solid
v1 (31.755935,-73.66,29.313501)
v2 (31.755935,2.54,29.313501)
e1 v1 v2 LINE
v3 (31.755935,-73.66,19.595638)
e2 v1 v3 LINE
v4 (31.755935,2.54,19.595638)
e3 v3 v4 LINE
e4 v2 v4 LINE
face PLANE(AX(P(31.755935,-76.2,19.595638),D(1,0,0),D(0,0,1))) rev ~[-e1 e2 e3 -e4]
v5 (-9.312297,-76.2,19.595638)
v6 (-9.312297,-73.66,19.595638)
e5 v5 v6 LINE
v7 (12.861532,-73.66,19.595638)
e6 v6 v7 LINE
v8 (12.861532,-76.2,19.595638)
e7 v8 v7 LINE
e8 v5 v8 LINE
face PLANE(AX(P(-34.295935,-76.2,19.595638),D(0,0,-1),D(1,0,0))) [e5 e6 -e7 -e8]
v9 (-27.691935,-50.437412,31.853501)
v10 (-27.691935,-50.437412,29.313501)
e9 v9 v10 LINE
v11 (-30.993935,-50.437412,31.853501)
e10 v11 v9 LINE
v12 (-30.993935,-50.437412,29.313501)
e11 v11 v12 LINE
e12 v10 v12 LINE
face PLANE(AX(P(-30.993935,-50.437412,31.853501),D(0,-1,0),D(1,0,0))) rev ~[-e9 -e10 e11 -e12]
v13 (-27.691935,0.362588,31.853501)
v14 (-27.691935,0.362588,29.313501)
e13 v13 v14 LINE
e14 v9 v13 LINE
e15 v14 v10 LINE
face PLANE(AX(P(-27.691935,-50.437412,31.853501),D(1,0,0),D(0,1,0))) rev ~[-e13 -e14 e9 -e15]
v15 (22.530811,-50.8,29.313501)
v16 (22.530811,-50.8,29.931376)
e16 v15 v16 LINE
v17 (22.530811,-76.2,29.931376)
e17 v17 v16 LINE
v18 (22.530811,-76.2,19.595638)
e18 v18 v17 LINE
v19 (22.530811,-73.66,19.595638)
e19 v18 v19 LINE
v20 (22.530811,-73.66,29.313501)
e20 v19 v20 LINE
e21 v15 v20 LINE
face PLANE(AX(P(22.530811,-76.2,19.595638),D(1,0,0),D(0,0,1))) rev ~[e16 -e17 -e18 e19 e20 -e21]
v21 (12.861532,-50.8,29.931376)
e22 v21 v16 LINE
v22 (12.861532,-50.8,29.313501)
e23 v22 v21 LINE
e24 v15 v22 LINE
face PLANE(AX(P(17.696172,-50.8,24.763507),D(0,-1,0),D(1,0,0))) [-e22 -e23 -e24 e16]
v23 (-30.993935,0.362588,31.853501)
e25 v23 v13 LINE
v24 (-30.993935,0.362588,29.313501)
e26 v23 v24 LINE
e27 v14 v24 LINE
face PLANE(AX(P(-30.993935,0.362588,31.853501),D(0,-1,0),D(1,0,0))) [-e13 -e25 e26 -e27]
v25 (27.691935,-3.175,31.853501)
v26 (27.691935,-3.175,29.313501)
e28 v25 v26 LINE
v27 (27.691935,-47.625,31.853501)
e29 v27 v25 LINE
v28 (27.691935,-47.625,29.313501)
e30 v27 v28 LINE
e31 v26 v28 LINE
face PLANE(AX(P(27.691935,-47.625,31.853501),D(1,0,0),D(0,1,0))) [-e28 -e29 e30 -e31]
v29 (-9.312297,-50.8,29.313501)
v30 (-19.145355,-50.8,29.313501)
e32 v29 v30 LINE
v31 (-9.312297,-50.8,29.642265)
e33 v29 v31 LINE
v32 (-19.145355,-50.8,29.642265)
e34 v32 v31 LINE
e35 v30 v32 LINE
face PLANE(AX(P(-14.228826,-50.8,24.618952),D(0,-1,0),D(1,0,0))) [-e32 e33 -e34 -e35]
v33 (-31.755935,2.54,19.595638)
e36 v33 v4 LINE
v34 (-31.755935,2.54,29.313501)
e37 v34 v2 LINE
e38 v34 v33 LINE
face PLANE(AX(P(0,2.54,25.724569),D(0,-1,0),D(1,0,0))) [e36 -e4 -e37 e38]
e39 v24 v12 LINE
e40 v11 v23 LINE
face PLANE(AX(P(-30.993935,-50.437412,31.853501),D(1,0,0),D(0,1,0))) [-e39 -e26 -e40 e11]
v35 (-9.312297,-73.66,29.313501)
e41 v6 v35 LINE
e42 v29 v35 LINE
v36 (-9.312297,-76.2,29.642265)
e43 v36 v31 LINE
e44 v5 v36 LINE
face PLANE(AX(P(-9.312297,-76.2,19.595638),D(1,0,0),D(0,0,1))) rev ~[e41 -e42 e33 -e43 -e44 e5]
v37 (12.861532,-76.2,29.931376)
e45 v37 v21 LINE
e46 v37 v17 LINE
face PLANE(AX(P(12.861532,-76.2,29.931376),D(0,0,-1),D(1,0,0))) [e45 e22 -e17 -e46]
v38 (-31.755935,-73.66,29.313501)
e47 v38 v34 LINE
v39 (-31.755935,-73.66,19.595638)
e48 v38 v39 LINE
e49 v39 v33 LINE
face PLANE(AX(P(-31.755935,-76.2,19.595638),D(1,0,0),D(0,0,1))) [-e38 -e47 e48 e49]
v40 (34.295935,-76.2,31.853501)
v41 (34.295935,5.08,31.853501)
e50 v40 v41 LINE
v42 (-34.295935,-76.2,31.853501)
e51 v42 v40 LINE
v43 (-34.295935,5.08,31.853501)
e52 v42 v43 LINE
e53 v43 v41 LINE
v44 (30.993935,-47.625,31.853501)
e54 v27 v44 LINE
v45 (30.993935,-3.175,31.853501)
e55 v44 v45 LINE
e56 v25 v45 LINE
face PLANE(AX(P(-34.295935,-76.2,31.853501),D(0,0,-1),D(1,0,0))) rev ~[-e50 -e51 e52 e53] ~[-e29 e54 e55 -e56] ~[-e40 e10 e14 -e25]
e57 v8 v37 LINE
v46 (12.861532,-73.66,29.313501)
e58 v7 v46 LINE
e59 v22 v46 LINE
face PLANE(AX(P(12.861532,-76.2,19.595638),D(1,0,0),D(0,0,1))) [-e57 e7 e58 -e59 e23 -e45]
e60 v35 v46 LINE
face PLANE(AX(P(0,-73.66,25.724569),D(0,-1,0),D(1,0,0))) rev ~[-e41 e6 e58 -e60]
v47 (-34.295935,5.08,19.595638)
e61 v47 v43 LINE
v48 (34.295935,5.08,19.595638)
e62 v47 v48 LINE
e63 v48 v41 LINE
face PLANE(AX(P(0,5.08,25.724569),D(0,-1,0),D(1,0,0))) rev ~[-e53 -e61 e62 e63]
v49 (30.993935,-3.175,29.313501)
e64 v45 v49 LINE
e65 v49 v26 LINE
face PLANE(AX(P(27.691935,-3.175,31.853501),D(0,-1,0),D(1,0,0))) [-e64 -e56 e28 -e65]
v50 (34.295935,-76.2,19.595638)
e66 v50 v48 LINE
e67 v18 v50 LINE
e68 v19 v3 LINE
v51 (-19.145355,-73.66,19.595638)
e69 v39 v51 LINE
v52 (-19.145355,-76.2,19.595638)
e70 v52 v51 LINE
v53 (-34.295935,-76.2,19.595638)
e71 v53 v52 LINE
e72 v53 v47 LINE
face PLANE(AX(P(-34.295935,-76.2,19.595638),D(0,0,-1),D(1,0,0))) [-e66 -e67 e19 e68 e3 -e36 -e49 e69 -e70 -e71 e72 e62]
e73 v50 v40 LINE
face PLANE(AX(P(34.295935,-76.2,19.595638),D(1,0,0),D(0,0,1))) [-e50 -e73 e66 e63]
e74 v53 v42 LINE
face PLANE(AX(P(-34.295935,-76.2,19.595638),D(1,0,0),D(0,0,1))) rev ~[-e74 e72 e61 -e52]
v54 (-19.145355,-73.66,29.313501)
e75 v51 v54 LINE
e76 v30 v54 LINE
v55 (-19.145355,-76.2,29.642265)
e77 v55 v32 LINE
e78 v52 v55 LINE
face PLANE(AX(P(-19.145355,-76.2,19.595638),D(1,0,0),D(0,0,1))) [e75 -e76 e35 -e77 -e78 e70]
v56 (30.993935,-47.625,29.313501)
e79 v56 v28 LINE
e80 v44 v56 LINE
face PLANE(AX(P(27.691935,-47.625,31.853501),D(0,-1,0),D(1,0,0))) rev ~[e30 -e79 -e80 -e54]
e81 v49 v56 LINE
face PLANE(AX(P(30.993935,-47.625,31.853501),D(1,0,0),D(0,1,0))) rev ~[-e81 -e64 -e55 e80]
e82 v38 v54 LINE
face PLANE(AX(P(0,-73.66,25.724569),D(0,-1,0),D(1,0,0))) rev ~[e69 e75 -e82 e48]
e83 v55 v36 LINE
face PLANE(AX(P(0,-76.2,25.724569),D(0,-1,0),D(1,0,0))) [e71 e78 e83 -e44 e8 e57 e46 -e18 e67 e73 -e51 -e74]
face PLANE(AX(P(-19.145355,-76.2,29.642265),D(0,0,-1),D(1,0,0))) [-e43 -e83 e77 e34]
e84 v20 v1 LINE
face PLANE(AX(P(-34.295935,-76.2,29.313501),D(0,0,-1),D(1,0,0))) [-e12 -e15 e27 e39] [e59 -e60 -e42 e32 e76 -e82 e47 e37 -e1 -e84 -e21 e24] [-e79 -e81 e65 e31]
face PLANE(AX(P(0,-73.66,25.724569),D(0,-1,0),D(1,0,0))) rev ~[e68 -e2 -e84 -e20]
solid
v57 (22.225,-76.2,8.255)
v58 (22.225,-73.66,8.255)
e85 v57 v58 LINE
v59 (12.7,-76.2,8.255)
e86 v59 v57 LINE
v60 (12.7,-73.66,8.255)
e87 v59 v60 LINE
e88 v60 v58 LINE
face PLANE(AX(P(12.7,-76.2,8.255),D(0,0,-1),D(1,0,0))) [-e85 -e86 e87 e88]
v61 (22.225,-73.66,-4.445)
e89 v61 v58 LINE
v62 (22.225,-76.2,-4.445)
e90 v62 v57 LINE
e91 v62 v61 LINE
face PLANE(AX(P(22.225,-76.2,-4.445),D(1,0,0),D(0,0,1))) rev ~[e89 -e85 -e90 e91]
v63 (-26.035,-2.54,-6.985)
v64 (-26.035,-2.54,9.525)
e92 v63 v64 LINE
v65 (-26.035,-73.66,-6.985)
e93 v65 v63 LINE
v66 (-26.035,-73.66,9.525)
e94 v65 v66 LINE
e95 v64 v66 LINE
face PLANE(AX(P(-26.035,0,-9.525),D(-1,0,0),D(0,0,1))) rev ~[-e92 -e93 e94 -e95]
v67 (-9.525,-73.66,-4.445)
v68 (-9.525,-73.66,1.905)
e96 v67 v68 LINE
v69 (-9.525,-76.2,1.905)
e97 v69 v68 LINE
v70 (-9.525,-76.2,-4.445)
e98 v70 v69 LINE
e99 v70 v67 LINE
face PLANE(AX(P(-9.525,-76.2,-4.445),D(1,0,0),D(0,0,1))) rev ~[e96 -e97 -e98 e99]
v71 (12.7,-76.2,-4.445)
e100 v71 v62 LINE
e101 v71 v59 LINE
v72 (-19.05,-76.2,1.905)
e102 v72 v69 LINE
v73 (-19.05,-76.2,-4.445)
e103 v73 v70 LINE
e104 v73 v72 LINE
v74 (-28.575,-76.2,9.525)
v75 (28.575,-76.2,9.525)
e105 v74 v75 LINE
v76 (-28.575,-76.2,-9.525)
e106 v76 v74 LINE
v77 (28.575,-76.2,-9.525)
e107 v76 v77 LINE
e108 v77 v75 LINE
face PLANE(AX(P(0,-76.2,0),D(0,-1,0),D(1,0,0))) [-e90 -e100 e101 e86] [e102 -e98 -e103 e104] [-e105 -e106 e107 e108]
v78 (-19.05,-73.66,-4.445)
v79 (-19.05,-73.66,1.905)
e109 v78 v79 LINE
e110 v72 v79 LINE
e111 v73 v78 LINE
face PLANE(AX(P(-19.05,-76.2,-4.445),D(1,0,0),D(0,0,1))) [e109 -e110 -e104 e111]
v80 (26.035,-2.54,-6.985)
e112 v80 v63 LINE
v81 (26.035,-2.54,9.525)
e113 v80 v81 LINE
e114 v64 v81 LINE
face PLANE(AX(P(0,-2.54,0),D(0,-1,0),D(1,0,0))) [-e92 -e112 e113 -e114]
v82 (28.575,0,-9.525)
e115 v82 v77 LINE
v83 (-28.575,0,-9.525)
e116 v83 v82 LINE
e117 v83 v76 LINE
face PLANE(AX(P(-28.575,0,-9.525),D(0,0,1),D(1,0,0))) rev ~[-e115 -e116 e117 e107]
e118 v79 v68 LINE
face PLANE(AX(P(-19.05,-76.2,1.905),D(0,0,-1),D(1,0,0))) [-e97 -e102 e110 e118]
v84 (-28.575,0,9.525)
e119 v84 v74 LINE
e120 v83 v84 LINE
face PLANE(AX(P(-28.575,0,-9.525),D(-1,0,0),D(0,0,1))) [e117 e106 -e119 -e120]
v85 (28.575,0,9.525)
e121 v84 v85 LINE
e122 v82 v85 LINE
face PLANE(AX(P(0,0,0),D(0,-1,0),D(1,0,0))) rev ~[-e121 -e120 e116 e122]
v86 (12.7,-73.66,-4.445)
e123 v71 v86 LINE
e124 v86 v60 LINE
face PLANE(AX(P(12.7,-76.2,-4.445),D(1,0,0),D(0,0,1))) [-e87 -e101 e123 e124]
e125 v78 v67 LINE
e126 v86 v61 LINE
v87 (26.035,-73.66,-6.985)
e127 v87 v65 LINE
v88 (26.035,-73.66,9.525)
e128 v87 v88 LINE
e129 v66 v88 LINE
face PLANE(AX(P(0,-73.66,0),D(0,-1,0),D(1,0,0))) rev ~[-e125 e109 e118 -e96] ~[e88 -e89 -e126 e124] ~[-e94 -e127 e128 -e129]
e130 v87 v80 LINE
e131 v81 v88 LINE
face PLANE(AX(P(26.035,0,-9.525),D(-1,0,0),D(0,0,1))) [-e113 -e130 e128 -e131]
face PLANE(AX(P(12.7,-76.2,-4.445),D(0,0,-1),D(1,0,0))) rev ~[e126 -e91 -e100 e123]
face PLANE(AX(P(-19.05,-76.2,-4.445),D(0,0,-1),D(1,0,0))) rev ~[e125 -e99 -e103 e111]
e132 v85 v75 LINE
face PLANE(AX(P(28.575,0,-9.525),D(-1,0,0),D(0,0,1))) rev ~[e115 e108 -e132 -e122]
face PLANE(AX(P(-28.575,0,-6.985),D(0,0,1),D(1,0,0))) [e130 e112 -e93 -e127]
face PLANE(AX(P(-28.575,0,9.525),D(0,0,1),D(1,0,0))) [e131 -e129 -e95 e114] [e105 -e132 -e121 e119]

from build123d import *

# Parameters (mm, degrees)
F0_W      = 57.15
F0_H      = 19.05
F1_DEPTH  = 76.2
F2_T      = -2.54
F3_W      = 9.525
F3_H      = 6.35
F4_DEPTH  = 25.4
F5_W      = 9.525
F5_H      = 12.7
F6_DEPTH  = 25.4
F8_W      = 68.5918703675
F8_H      = 12.2578628361
F9_DEPTH  = 81.28
F10_T     = -2.54
F11_W     = 9.833057411
F11_H     = 10.0466273725
F11_W_2   = 9.6692787483
F11_H_2   = 10.3357378393
F12_DEPTH = 25.4
F13_W     = 3.302
F13_H     = 50.8
F14_DEPTH = 25.4
F15_W     = 3.302
F15_H     = 44.45
F16_DEPTH = 25.4


with BuildPart() as f1:
    # F0 (on Front) → F1 (new body)
    with BuildSketch(Plane.XZ):
        Rectangle(F0_W, F0_H)
    extrude(amount=F1_DEPTH)

    # F2
    f2_openings = [f1.faces().sort_by_distance(p)[0] for p in [
        (0, -38.1, 9.525),
    ]]
    offset(amount=F2_T, openings=f2_openings)

    # F3 (on face) → F4 (cut)
    with BuildSketch(Plane.XZ.offset(76.2)):
        with Locations((-14.2875, -1.27)):
            Rectangle(F3_W, F3_H)
    extrude(amount=-F4_DEPTH, mode=Mode.SUBTRACT)

    # F5 (on face) → F6 (cut)
    with BuildSketch(Plane.XZ.offset(76.2)):
        with Locations((17.4625, 1.905)):
            Rectangle(F5_W, F5_H)
    extrude(amount=-F6_DEPTH, mode=Mode.SUBTRACT)


with BuildPart() as f9:
    # F8 (on face) → F9 (new body)
    with BuildSketch(Plane.XZ.offset(76.2)):
        with Locations((0, 25.7245693356)):
            Rectangle(F8_W, F8_H)
    extrude(amount=-F9_DEPTH)

    # F10
    f10_openings = [f9.faces().sort_by_distance(p)[0] for p in [
        (0, -35.56, 19.595638),
    ]]
    offset(amount=F10_T, openings=f10_openings)

    # F11 (on face) → F12 (cut)
    with BuildSketch(Plane.XZ.offset(76.2)):
        with Locations((-14.2288259231, 24.6189516038)):
            Rectangle(F11_W, F11_H)
        with Locations((17.6961715333, 24.7635068372)):
            Rectangle(F11_W_2, F11_H_2)
    extrude(amount=-F12_DEPTH, mode=Mode.SUBTRACT)

    # F13 (on face) → F14 (cut)
    with BuildSketch(Plane.XY.offset(31.8535007536)):
        with Locations((-29.3429351838, -25.0374122988)):
            Rectangle(F13_W, F13_H)
    extrude(amount=-F14_DEPTH, mode=Mode.SUBTRACT)

    # F15 (on face) → F16 (cut)
    with BuildSketch(Plane.XY.offset(31.8535007536)):
        with Locations((29.3429351838, -25.4)):
            Rectangle(F15_W, F15_H)
    extrude(amount=-F16_DEPTH, mode=Mode.SUBTRACT)


solid = Compound([f1.part, f9.part])
